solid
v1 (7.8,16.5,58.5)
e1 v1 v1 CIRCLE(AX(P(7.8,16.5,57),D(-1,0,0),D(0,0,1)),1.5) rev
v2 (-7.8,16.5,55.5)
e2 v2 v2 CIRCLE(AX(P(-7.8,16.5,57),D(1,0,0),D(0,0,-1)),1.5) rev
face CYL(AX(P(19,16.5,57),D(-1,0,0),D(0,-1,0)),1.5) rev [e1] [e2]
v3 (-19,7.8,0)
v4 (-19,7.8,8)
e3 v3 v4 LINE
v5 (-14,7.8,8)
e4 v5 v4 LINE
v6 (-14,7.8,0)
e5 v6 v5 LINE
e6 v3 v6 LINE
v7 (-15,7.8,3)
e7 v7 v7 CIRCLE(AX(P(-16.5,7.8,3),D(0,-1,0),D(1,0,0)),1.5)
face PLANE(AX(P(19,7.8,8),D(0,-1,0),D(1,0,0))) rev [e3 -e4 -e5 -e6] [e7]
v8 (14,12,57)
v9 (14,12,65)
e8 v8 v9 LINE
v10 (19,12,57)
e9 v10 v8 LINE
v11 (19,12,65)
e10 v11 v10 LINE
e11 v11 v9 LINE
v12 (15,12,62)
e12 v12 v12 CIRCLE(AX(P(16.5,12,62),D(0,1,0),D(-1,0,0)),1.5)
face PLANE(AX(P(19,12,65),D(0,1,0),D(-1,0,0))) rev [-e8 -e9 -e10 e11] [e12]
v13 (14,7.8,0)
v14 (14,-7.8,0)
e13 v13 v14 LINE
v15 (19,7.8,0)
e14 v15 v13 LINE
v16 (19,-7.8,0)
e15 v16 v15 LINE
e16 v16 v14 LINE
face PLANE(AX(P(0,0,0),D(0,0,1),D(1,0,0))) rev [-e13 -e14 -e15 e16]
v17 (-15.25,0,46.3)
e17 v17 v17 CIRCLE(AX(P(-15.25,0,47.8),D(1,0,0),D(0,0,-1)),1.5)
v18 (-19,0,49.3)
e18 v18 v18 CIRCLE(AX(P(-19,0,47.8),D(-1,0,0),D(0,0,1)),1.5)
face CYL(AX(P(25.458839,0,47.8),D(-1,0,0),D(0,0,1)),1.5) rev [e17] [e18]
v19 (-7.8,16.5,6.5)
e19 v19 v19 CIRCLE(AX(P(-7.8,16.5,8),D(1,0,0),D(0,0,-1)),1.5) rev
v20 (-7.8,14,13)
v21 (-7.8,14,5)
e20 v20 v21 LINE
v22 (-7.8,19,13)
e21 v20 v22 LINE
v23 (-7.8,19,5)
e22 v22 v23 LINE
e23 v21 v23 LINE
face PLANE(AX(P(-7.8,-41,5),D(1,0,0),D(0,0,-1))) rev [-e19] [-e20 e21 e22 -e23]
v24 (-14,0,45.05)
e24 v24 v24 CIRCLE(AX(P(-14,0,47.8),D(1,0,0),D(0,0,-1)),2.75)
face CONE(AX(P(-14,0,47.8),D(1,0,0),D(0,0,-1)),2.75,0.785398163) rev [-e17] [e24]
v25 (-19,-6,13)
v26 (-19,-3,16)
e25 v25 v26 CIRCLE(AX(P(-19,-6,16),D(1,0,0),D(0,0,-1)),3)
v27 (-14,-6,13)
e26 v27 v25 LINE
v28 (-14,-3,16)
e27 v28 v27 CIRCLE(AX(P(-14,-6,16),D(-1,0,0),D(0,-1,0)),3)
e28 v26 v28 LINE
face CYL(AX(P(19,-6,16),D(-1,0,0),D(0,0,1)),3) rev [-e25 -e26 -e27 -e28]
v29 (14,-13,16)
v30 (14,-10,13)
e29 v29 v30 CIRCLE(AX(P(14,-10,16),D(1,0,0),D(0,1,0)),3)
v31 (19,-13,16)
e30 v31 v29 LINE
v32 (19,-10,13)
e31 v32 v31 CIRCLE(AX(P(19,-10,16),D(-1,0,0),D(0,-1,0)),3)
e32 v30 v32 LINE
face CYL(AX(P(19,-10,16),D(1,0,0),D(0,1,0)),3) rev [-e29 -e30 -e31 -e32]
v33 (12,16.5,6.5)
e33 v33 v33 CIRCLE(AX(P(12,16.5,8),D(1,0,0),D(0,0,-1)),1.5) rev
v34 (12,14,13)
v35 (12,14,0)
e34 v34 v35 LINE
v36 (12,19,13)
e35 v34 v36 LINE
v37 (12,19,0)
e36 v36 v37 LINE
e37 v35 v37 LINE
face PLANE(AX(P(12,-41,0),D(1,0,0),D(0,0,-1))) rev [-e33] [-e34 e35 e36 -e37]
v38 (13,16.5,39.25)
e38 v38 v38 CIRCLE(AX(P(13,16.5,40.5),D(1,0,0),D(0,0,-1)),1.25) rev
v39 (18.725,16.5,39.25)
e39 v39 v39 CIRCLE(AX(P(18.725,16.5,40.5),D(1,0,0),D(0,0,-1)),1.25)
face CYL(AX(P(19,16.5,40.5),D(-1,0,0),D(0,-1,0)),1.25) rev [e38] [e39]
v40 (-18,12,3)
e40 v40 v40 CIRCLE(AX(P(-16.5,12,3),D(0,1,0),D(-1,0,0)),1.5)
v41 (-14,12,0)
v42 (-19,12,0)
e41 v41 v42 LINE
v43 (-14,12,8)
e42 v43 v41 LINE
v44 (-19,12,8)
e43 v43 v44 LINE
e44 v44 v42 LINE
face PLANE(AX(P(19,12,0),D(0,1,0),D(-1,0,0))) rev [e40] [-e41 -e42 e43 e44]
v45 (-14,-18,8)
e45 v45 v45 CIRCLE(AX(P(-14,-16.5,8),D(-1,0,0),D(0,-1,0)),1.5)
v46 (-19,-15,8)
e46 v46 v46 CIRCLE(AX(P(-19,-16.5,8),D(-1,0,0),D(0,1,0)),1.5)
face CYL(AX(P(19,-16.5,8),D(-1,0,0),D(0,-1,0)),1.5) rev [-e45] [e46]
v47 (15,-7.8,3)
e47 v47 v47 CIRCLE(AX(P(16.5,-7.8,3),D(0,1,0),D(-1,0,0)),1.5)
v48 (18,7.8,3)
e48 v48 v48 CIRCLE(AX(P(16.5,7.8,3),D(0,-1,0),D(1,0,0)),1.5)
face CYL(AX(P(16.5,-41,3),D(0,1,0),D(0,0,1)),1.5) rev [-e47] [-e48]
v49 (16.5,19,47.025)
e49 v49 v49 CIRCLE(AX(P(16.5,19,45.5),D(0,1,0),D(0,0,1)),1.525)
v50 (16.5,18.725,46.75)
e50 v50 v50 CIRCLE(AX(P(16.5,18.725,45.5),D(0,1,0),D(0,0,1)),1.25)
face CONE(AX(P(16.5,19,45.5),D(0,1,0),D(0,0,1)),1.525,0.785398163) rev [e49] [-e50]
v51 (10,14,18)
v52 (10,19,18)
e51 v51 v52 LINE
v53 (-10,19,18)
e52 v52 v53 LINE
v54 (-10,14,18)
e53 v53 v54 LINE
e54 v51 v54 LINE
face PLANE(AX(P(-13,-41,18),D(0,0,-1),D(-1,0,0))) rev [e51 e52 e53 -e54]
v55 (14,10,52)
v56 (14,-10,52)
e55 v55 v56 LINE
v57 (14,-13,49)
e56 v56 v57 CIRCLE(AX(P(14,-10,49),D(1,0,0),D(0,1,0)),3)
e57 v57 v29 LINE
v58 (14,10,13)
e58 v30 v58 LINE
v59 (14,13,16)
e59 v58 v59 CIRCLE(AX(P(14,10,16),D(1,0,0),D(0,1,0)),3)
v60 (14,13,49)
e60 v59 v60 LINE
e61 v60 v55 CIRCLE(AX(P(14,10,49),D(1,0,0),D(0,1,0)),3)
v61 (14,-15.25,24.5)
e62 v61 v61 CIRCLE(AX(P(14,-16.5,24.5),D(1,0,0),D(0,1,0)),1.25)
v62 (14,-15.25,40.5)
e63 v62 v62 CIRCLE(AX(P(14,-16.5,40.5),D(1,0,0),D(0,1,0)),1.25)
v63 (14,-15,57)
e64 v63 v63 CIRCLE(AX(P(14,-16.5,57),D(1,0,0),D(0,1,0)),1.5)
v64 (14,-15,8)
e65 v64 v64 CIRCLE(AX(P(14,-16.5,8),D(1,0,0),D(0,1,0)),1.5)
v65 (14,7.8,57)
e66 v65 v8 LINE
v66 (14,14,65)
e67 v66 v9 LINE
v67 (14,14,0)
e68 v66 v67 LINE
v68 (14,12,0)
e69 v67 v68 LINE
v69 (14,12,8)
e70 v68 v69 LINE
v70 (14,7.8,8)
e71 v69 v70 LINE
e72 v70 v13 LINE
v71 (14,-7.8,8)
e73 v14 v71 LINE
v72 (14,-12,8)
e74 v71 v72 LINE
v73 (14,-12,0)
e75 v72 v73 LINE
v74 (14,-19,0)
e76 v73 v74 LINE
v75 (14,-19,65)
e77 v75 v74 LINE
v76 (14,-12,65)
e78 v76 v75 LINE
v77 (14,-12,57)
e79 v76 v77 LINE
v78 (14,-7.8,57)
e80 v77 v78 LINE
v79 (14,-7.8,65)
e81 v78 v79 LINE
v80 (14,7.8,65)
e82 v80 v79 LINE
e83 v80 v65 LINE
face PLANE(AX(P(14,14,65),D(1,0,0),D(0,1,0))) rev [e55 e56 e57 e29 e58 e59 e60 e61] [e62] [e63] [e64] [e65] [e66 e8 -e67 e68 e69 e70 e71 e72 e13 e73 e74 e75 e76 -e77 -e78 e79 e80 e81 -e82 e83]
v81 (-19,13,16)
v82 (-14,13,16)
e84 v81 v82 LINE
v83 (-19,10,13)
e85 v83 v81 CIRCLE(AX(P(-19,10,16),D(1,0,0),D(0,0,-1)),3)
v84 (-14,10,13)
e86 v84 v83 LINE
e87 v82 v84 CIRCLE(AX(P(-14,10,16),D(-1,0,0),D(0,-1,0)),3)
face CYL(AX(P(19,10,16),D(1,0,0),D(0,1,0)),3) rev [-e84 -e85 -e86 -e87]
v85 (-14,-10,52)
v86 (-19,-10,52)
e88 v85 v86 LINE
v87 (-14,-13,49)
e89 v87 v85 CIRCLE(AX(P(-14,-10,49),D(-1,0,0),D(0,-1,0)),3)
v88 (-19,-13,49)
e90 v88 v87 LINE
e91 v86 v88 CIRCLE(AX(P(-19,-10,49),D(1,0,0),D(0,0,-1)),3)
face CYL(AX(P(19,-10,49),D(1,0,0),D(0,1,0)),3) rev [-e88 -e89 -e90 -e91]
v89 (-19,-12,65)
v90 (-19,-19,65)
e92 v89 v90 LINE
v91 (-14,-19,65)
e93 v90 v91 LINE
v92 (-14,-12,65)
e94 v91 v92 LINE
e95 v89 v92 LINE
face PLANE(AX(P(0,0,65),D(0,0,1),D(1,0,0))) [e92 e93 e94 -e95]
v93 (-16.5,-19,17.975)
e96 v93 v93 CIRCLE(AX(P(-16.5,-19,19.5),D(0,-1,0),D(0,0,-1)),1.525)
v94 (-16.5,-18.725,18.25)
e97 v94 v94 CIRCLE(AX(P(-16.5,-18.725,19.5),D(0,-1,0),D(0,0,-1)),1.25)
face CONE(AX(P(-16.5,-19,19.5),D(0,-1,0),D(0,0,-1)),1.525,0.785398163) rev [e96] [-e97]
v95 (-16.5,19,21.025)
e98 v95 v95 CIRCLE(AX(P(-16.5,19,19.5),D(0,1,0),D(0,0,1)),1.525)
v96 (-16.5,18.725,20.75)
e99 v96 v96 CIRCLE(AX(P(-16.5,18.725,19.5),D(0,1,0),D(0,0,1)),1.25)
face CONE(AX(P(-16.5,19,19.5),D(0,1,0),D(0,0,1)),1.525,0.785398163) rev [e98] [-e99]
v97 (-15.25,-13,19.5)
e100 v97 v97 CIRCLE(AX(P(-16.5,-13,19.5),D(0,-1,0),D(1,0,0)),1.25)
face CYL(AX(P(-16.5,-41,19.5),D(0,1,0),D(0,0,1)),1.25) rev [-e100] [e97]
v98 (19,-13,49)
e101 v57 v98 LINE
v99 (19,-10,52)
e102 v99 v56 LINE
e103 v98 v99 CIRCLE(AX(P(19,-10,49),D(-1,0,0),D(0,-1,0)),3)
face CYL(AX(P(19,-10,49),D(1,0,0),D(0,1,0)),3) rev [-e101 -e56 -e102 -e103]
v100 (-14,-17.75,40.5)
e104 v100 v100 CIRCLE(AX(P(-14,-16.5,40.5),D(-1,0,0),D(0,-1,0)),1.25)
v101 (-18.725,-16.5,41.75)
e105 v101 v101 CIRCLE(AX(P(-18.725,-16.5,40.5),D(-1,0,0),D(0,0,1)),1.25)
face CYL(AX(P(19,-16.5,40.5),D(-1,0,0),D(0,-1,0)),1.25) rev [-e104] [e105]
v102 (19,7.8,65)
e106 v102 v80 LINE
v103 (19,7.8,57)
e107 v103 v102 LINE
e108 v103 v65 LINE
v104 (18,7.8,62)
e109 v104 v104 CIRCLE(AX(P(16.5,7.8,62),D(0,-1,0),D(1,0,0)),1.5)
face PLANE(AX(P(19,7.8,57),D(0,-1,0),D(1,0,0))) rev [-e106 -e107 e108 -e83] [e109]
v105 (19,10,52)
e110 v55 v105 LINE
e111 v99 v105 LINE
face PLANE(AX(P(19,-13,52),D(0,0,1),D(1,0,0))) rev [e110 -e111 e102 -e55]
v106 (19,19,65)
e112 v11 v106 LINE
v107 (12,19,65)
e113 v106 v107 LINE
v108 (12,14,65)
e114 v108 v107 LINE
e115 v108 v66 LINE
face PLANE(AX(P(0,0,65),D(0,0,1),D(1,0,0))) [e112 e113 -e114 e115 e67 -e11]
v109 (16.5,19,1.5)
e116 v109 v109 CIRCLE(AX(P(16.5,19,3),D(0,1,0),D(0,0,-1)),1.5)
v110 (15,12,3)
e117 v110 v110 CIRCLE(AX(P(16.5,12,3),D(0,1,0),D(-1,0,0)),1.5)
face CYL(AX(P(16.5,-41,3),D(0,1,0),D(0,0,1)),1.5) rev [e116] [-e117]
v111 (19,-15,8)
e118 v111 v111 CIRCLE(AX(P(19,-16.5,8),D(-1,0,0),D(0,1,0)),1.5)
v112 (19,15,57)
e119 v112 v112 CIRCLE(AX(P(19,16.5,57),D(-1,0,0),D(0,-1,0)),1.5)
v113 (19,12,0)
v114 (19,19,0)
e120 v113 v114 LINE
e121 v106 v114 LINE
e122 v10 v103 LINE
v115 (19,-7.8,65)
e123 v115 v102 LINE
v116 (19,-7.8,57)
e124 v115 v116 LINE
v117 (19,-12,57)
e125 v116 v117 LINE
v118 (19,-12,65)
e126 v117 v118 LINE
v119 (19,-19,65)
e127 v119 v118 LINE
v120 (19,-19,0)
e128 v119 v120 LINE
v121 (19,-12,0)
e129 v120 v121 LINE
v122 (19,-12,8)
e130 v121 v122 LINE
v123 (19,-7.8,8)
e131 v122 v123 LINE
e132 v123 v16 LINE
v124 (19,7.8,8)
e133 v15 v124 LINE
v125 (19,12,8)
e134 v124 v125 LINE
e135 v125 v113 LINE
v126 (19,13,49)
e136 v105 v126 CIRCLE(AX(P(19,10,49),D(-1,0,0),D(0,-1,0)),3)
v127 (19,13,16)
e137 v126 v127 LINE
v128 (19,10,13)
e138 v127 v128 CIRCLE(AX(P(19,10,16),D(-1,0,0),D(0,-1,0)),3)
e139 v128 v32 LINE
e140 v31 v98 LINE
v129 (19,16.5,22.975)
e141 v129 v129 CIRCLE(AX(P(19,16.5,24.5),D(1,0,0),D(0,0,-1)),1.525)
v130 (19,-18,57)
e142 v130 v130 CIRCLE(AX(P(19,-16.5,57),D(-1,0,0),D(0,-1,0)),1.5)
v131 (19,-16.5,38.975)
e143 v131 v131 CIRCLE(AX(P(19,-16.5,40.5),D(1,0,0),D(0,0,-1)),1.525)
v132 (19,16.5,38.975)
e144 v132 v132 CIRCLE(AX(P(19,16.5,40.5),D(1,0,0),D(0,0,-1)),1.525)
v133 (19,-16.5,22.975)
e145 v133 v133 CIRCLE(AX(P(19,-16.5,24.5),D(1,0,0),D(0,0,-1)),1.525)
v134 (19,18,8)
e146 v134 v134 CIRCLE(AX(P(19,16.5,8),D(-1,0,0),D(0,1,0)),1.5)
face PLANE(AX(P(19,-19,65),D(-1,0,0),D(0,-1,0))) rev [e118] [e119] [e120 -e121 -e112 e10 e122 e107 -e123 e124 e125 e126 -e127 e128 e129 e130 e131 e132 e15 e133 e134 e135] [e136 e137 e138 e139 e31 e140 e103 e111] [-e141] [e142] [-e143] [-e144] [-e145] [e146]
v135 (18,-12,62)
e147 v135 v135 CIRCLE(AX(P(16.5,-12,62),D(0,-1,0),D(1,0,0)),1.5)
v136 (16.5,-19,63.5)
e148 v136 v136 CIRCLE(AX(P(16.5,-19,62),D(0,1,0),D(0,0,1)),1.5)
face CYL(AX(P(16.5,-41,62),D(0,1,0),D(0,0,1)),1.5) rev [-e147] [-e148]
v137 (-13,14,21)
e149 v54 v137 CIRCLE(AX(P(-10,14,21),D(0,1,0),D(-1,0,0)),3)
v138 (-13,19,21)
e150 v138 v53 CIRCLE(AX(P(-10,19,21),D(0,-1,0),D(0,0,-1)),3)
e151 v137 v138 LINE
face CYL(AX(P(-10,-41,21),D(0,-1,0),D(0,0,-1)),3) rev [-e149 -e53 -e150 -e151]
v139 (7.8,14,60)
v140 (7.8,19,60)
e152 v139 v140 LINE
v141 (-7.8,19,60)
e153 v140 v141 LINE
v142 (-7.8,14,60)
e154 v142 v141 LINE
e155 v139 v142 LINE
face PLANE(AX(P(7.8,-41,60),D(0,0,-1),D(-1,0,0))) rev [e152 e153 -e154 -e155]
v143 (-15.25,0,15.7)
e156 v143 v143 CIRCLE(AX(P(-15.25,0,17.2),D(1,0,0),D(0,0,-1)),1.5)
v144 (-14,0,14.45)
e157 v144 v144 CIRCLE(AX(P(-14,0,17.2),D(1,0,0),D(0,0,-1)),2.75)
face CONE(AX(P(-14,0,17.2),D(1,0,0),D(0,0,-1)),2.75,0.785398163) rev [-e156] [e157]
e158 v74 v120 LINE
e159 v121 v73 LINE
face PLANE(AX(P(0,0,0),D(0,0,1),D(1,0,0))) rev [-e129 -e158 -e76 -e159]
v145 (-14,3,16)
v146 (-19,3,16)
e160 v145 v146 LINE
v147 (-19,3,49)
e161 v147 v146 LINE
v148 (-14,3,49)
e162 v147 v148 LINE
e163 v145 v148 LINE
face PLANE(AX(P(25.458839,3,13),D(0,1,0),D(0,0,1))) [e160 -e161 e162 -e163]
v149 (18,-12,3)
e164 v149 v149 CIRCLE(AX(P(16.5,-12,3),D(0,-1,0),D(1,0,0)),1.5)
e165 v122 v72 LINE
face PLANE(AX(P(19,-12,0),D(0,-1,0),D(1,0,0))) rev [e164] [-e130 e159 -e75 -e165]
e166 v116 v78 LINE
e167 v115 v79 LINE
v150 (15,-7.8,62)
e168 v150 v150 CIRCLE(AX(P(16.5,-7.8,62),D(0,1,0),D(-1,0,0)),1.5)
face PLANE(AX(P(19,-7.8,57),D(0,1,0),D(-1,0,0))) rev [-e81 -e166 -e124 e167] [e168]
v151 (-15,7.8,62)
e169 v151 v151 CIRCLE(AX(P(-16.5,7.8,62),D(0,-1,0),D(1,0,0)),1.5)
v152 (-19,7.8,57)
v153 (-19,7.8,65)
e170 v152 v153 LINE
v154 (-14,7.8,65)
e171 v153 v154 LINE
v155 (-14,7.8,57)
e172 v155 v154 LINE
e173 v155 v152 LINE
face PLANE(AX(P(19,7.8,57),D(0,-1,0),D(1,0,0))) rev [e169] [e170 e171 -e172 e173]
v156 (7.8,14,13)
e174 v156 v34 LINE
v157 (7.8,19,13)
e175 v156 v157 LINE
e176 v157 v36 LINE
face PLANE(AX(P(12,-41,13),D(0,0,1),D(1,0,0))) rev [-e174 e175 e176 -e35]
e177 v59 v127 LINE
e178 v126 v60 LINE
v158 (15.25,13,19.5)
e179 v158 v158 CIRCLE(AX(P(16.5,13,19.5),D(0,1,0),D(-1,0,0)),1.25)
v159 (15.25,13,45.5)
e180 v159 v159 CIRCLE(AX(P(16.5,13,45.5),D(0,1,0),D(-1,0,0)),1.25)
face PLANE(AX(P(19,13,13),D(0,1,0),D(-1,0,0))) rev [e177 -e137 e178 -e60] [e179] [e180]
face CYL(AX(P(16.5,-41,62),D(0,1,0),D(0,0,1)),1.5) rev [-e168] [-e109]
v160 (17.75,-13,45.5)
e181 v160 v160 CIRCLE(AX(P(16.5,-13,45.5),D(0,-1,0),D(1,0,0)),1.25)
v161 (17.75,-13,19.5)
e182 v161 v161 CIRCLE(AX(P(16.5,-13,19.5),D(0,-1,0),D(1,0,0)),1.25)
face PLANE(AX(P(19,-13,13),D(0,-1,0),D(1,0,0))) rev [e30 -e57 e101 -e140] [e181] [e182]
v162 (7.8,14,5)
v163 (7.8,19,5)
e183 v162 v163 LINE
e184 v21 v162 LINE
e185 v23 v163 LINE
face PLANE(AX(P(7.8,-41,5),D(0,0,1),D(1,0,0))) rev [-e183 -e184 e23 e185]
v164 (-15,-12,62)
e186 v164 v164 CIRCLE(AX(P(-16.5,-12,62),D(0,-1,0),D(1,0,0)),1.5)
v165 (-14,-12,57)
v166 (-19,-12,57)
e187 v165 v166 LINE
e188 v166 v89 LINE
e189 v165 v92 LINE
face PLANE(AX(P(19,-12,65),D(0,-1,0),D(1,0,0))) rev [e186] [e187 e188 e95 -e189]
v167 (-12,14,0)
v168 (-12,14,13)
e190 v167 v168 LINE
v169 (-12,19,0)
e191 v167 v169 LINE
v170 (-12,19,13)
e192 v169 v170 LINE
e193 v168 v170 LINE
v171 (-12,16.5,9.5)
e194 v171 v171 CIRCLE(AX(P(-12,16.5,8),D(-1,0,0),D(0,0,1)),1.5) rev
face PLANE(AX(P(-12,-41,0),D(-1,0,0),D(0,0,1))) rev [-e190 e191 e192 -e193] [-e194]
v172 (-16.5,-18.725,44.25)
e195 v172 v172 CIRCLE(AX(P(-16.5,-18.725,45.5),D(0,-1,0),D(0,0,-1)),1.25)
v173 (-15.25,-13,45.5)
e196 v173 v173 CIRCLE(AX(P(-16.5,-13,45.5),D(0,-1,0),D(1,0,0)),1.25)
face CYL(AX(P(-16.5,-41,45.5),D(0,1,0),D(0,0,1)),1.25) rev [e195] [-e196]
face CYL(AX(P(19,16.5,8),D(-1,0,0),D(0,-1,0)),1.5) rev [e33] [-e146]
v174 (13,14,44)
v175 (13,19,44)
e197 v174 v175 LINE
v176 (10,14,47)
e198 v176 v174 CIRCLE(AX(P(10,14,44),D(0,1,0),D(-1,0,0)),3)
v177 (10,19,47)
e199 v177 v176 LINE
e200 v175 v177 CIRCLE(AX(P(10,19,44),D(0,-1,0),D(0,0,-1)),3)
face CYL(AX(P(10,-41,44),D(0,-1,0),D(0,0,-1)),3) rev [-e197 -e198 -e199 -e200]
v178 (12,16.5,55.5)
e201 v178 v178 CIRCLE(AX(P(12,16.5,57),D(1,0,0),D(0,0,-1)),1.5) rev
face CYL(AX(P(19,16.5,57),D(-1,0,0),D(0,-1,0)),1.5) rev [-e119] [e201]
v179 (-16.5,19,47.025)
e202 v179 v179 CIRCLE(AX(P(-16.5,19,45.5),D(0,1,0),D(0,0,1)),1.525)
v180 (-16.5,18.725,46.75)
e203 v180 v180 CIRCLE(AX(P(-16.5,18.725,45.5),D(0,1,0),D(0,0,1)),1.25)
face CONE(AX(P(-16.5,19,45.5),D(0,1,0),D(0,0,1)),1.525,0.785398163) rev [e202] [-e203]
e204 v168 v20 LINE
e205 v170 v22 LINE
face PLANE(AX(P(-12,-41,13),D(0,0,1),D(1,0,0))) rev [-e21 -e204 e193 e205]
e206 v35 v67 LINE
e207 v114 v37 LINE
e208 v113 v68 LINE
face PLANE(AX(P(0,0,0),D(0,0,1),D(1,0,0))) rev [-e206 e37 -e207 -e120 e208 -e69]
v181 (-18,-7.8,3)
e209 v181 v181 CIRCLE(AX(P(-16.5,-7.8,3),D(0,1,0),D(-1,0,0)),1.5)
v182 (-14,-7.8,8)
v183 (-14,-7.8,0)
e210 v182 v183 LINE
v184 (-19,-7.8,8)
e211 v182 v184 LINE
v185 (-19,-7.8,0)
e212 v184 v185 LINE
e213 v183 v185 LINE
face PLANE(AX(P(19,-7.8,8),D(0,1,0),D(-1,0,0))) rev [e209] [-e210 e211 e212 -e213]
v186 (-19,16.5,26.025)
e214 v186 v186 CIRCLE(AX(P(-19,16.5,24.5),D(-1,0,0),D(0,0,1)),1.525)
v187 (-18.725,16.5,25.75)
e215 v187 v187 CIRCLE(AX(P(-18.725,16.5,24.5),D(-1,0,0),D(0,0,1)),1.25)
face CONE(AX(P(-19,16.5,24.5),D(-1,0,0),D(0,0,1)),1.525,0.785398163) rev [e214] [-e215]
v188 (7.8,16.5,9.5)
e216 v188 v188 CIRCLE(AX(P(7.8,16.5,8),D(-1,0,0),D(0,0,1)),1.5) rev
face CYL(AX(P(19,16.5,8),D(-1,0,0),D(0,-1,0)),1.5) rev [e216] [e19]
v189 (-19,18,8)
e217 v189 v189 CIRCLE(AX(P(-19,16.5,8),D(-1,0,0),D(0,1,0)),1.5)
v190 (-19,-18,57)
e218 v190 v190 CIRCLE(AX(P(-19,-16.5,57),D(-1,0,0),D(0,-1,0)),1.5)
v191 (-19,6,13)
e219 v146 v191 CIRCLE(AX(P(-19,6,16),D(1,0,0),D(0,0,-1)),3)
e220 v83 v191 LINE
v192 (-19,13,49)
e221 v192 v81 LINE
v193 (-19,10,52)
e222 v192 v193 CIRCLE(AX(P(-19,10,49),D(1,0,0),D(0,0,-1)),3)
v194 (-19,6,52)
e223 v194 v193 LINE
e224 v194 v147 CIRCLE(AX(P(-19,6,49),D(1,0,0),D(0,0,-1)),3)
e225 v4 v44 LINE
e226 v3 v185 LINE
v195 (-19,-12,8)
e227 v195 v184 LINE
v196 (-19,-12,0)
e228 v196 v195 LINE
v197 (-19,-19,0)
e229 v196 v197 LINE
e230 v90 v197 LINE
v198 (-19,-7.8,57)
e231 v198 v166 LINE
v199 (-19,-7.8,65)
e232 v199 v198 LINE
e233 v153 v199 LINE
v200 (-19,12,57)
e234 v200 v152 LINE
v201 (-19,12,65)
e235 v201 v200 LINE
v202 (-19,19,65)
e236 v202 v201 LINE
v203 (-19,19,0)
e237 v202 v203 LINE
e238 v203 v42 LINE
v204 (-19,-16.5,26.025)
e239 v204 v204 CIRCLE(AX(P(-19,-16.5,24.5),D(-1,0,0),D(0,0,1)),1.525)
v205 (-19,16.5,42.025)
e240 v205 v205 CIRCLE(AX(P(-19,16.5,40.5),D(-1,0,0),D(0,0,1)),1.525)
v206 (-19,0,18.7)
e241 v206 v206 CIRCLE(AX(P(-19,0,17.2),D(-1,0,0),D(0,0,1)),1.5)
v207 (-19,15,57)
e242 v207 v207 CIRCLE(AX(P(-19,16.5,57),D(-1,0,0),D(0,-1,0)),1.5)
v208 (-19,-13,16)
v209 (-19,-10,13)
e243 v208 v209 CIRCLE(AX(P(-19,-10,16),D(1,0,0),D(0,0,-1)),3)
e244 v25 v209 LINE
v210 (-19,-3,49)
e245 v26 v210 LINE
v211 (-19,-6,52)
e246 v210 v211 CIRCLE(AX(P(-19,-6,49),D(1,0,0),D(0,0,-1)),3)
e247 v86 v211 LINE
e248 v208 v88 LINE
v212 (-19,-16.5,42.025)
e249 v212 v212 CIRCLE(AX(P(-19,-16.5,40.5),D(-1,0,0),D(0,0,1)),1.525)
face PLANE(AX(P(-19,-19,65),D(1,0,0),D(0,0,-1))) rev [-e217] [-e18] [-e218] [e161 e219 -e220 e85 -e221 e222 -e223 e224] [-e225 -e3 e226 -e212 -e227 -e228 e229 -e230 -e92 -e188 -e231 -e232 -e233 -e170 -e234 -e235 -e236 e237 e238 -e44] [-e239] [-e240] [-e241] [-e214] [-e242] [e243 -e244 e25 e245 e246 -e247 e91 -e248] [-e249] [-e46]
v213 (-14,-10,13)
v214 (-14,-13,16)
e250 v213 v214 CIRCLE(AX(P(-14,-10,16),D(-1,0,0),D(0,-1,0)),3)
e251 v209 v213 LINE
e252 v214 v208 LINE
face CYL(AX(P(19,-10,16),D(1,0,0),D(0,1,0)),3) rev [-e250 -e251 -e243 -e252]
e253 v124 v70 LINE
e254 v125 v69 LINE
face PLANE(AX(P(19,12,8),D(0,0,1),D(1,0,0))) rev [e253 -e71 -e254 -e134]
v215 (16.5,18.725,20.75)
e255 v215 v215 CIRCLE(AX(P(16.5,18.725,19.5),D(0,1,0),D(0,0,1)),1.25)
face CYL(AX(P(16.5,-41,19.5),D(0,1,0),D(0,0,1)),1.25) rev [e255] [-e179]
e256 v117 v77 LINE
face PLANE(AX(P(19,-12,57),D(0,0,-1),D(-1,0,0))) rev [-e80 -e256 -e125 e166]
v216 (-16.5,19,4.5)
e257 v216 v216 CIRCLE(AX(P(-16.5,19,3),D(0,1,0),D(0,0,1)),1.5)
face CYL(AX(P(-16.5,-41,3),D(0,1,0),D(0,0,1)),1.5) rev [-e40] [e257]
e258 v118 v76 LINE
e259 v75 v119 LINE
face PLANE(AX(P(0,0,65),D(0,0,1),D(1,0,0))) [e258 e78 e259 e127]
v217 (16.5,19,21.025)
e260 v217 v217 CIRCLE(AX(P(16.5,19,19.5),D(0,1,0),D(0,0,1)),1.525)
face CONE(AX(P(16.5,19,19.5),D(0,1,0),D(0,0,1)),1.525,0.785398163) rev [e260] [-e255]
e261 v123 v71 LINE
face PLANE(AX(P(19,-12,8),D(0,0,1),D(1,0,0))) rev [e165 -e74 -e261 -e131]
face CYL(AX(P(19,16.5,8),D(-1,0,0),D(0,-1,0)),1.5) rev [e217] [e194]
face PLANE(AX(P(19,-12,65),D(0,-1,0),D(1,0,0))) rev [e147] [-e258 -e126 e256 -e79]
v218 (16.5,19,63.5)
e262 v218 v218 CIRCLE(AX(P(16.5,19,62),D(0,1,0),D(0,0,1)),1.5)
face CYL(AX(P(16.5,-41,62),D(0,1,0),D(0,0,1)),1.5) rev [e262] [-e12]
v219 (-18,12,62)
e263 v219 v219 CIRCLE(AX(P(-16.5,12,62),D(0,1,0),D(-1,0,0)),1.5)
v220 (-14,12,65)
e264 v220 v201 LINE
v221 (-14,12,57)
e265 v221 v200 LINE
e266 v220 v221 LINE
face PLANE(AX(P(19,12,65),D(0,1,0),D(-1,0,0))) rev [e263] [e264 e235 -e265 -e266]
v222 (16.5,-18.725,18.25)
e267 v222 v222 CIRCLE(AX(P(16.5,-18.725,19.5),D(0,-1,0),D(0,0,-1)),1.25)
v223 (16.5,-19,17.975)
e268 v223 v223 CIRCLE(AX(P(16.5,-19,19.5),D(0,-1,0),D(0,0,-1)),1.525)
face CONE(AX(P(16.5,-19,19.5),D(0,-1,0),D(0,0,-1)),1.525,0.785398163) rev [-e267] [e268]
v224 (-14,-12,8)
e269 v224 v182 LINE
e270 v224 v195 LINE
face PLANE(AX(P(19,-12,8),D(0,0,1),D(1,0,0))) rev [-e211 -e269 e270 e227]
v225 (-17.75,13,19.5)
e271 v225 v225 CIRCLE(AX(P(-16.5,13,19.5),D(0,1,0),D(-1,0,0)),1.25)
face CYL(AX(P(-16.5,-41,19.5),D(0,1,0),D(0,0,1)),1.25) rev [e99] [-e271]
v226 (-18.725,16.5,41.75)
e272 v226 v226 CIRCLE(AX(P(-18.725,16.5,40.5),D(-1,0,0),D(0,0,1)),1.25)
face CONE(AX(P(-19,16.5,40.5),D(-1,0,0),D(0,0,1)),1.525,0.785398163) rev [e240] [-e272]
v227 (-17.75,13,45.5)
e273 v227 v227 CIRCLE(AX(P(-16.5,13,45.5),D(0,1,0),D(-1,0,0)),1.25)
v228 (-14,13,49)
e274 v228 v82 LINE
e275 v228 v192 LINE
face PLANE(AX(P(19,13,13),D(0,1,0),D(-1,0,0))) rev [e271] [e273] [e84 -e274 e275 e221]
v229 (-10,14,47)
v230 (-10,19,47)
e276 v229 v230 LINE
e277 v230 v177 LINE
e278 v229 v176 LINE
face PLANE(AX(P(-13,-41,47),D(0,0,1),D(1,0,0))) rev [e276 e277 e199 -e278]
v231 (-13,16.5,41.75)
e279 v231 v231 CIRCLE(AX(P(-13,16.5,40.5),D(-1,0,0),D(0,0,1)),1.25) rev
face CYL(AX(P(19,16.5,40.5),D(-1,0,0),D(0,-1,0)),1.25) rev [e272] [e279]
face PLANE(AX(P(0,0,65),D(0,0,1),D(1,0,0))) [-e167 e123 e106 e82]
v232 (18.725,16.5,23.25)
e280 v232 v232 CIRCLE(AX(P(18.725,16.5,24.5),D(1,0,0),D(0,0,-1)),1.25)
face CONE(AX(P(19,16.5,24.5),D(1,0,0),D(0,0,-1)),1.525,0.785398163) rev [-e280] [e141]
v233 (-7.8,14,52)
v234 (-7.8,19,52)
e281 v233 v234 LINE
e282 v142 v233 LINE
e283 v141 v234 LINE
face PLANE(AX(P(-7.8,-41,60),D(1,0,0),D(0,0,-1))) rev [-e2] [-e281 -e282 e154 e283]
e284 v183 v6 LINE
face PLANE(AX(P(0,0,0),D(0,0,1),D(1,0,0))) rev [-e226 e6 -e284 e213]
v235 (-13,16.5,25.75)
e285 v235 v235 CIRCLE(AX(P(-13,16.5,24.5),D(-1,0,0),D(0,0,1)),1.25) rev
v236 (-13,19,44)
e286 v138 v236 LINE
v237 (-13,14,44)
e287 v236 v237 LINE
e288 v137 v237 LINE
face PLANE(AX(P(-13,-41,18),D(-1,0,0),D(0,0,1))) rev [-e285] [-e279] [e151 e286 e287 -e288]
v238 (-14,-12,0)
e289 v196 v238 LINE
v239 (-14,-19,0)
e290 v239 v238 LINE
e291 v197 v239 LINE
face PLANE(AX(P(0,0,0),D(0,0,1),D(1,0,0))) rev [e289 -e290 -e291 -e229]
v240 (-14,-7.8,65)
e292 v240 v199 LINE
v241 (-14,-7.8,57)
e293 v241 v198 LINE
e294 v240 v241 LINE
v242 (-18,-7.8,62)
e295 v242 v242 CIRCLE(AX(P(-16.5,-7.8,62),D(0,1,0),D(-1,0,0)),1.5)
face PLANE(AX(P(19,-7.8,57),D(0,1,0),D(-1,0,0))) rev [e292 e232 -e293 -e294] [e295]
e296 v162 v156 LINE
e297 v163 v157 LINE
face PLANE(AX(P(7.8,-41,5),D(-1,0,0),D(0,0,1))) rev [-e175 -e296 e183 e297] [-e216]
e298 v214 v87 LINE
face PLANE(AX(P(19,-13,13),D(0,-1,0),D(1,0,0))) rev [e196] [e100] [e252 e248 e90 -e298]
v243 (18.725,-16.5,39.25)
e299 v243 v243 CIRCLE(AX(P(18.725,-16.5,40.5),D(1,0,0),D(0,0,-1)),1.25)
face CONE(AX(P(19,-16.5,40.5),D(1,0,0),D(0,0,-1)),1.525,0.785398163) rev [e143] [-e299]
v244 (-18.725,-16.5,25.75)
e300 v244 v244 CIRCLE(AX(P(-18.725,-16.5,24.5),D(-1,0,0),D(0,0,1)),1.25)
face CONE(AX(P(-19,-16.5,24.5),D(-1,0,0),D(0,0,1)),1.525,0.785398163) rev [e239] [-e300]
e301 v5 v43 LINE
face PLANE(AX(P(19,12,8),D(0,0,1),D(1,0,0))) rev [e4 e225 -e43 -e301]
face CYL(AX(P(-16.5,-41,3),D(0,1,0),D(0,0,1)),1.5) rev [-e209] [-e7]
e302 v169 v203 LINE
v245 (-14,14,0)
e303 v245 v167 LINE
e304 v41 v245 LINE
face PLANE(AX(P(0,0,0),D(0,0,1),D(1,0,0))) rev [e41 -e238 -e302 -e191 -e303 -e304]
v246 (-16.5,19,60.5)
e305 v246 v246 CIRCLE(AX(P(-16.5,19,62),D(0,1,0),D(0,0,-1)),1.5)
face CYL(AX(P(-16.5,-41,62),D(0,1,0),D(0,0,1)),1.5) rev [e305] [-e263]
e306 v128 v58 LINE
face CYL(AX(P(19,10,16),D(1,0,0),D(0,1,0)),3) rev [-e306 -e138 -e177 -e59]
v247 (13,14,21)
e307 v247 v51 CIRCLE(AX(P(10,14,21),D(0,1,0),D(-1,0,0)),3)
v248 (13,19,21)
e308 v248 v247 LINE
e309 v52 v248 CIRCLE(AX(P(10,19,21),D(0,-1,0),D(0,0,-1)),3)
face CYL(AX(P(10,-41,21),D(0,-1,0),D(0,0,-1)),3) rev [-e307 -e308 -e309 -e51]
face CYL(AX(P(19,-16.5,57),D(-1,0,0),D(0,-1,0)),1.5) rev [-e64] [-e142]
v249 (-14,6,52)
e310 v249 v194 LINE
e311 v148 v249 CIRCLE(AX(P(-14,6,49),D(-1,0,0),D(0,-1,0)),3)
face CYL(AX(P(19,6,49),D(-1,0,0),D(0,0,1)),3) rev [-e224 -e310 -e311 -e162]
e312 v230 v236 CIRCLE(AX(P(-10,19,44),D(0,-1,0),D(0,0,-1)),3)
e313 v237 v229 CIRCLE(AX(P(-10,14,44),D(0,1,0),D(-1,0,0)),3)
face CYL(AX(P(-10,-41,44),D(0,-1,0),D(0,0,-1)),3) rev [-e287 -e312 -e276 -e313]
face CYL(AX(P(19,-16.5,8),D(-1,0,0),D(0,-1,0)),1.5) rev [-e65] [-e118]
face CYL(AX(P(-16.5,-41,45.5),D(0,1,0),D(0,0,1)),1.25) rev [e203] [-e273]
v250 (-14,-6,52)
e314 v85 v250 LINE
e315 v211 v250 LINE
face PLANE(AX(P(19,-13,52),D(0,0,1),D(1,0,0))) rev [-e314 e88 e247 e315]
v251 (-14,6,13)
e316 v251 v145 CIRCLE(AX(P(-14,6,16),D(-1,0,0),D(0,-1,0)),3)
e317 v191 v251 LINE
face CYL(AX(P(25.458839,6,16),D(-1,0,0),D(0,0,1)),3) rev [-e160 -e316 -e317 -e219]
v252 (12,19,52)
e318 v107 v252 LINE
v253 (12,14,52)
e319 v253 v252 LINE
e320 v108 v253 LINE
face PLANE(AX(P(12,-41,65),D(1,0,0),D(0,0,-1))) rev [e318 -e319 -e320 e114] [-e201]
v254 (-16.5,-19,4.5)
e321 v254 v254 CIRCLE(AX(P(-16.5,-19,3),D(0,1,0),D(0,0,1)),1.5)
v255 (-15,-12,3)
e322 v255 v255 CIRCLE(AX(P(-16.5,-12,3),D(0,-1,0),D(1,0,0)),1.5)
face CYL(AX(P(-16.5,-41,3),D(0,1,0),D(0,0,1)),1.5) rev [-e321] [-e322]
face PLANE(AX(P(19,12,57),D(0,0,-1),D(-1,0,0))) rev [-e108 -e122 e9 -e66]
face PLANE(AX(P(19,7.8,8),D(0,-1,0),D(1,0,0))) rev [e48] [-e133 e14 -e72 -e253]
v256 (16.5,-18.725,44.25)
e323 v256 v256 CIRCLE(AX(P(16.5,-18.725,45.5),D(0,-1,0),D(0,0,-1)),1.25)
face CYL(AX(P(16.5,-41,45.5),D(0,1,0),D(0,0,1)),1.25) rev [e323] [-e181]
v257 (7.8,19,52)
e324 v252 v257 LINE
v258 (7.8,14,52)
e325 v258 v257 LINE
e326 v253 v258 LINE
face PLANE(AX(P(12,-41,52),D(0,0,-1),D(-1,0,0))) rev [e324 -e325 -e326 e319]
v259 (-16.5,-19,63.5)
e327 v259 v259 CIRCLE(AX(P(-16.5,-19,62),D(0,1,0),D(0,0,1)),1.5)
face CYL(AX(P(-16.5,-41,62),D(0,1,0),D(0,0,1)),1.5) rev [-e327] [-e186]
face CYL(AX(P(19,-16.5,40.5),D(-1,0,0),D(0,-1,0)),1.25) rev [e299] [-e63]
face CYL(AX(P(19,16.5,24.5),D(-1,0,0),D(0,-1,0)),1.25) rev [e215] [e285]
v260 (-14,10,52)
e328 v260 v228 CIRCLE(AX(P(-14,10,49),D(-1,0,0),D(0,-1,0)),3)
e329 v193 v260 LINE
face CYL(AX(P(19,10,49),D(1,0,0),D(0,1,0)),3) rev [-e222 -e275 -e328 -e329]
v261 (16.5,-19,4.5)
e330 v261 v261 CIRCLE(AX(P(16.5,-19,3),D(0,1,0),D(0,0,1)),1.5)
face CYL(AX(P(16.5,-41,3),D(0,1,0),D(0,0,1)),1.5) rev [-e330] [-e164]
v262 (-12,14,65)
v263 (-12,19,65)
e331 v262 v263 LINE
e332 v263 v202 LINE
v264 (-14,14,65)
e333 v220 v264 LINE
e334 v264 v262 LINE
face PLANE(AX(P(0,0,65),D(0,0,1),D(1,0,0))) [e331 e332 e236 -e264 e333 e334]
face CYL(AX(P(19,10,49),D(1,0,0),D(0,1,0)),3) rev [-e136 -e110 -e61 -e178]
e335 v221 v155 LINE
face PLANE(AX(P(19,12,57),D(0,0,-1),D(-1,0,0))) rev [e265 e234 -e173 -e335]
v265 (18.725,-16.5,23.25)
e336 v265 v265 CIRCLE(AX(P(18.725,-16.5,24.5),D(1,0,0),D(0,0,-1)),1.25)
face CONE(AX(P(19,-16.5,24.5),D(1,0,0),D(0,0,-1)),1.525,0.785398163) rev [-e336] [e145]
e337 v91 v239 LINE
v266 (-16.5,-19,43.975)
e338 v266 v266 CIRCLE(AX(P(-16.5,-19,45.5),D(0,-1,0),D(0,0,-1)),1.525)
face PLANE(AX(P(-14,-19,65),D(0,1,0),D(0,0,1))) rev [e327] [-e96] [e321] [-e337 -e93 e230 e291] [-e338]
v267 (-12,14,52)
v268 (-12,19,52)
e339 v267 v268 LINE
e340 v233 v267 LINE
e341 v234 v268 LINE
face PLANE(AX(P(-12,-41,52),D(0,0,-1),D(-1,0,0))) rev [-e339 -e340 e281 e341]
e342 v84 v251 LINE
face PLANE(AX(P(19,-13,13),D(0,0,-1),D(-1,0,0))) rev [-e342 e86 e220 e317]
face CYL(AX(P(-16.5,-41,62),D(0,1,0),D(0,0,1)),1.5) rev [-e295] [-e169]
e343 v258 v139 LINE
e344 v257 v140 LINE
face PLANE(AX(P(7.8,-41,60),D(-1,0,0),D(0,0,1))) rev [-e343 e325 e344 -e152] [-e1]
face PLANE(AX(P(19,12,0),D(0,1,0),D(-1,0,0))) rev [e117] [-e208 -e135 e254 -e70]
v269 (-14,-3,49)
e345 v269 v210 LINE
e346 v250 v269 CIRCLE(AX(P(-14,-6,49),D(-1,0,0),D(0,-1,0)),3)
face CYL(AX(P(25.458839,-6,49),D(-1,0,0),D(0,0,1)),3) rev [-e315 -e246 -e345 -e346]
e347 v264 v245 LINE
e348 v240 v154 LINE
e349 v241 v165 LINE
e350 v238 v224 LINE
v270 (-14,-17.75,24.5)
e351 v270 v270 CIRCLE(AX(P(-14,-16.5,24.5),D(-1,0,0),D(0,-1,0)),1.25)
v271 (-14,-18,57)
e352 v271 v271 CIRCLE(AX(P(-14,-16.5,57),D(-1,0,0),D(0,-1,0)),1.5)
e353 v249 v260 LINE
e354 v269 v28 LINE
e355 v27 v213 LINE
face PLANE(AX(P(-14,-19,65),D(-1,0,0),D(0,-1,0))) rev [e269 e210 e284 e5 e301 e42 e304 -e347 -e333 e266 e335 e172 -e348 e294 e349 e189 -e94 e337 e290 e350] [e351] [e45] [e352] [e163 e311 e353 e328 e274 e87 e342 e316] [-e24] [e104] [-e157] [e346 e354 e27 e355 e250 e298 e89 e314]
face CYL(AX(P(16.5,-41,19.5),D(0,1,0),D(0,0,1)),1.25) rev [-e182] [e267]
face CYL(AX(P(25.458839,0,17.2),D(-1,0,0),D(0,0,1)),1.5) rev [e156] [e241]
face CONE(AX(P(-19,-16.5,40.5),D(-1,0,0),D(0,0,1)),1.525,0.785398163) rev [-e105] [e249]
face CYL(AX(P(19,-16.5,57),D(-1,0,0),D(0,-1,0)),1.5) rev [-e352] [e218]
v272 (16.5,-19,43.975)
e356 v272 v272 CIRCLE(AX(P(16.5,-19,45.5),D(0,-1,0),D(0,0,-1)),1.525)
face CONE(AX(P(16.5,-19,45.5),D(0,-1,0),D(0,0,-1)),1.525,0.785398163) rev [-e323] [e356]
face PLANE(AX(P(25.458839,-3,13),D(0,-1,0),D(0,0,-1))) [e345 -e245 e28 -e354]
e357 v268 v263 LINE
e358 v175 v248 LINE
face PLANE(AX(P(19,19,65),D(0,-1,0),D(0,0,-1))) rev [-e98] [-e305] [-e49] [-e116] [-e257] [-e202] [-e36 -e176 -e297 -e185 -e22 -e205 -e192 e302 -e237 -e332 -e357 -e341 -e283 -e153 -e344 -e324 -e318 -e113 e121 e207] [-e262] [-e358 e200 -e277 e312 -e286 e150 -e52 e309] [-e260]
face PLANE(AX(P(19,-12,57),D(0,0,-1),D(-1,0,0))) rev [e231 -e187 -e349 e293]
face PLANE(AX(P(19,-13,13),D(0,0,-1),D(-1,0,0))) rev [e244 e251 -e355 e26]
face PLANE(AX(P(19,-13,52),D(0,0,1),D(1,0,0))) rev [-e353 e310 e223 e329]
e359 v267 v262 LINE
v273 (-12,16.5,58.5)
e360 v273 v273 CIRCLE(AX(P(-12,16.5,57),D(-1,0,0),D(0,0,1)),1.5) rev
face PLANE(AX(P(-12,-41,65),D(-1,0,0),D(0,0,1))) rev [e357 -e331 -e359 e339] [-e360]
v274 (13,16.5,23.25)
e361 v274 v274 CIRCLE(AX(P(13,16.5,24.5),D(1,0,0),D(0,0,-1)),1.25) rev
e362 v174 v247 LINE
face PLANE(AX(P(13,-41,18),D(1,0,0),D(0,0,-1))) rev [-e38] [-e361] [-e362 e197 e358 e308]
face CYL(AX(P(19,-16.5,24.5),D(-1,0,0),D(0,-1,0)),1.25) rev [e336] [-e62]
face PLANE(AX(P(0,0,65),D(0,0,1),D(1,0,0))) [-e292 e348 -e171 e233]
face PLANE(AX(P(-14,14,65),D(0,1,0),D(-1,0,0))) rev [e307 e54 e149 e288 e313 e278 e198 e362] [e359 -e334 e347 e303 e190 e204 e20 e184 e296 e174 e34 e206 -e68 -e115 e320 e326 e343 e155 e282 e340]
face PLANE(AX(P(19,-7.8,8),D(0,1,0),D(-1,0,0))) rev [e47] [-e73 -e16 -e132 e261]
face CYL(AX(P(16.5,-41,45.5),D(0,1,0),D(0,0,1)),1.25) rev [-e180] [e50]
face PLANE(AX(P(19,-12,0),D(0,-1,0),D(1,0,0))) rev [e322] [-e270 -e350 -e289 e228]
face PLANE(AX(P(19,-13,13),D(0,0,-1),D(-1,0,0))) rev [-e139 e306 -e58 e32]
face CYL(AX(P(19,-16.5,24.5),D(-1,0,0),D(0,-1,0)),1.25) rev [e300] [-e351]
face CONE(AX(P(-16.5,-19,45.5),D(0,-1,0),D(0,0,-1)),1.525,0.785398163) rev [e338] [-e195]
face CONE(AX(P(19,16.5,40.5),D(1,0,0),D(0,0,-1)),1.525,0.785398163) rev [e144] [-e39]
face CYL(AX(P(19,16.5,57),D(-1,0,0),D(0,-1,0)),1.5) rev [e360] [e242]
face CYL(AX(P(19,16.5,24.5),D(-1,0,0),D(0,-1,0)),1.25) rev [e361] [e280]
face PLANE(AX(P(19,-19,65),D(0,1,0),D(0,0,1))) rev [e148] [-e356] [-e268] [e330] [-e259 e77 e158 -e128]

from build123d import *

# Parameters (mm, degrees)
EXTRUDE_1_DEPTH                = 65
SKETCH_2_R                     = 1.5
SKETCH_2_R_2                   = 1.25
SKETCH_2_W                     = 8
SKETCH_2_H                     = 4.2
SKETCH_2_W_2                   = 39
SKETCH_2_H_2                   = 26
CUT_EXTRUDE_1_DEPTH            = 78.653074633
SKETCH_3_R                     = 1.5
SKETCH_3_R_2                   = 1.25
SKETCH_3_W                     = 26
SKETCH_3_H                     = 29
CUT_EXTRUDE_2_DEPTH            = 60
SKETCH_5_W                     = 39
SKETCH_5_H                     = 6
SKETCH_5_R                     = 1.5
EXTRUDE_2_DEPTH                = 5
FILLET_1_R                     = 3
HOLE_WIZARD_M3_1_9_D           = 3
HOLE_WIZARD_M3_1_9_CSINK_D     = 5.5
HOLE_WIZARD_M3_1_9_CSINK_ANGLE = 90


# Read off the part's stored shape, not the designer's step: M3 螺纹孔1
with BuildPart() as part:
    # 草图1 → 凸台-拉伸1 (new body)
    with BuildSketch(Plane.XY):
        Polygon((-14, -19), (-14, 14), (14, 14), (14, -19), (19, -19), (19, 19), (-19, 19), (-19, -19), align=None)
    extrude(amount=EXTRUDE_1_DEPTH)

    # 草图2 → 切除-拉伸1 (cut, through all)
    with BuildSketch(Plane.ZY.offset(19)):
        with Locations(Location((57, -16.5, 0), (0, 0, 270))):
            Circle(SKETCH_2_R)
        with Locations(Location((57, 16.5, 0), (0, 0, 270))):
            Circle(SKETCH_2_R)
        with Locations(Location((8, -16.5, 0), (0, 0, 90))):
            Circle(SKETCH_2_R)
        with Locations(Location((8, 16.5, 0), (0, 0, 90))):
            Circle(SKETCH_2_R)
        with Locations(Location((40.5, -16.5, 0), (0, 0, 270))):
            Circle(SKETCH_2_R_2)
        with Locations(Location((24.5, -16.5, 0), (0, 0, 270))):
            Circle(SKETCH_2_R_2)
        with Locations(Location((24.5, 16.5, 0), (0, 0, 90))):
            Circle(SKETCH_2_R_2)
        with Locations(Location((40.5, 16.5, 0), (0, 0, 90))):
            Circle(SKETCH_2_R_2)
        with Locations((61, 9.9)):
            Rectangle(SKETCH_2_W, SKETCH_2_H)
        with Locations((61, -9.9)):
            Rectangle(SKETCH_2_W, SKETCH_2_H)
        with Locations((4, -9.9)):
            Rectangle(SKETCH_2_W, SKETCH_2_H)
        with Locations((4, 9.9)):
            Rectangle(SKETCH_2_W, SKETCH_2_H)
        with Locations((32.5, 0)):
            Rectangle(SKETCH_2_W_2, SKETCH_2_H_2)
    extrude(amount=-CUT_EXTRUDE_1_DEPTH, mode=Mode.SUBTRACT)

    # 草图3 → 切除-拉伸2 (cut)
    with BuildSketch(Plane(origin=(0, 19, 0), x_dir=(1, 0, 0), z_dir=(0, 1, 0))):
        with Locations(Location((16.5, -62, 0), (0, 0, 270))):
            Circle(SKETCH_3_R)
        with Locations(Location((-16.5, -62, 0), (0, 0, 270))):
            Circle(SKETCH_3_R)
        with Locations(Location((-16.5, -3, 0), (0, 0, 270))):
            Circle(SKETCH_3_R)
        with Locations(Location((16.5, -3, 0), (0, 0, 180))):
            Circle(SKETCH_3_R)
        with Locations(Location((16.5, -45.5, 0), (0, 0, 270))):
            Circle(SKETCH_3_R_2)
        with Locations(Location((16.5, -19.5, 0), (0, 0, 270))):
            Circle(SKETCH_3_R_2)
        with Locations(Location((-16.5, -19.5, 0), (0, 0, 270))):
            Circle(SKETCH_3_R_2)
        with Locations(Location((-16.5, -45.5, 0), (0, 0, 180))):
            Circle(SKETCH_3_R_2)
        Polygon((7.8, -65), (-7.8, -65), (-12, -65), (-12, -52), (-7.8, -52), (-7.8, -60), (7.8, -60), (7.8, -52), (12, -52), (12, -65), align=None)
        Polygon((-12, 0), (-12, -13), (-7.8, -13), (-7.8, -5), (7.8, -5), (7.8, -13), (12, -13), (12, 0), (7.8, 0), (-7.8, 0), align=None)
        with Locations((0, -32.5)):
            Rectangle(SKETCH_3_W, SKETCH_3_H)
    extrude(amount=-CUT_EXTRUDE_2_DEPTH, mode=Mode.SUBTRACT)

    # Hole Wizard M3 _1 outline → Hole Wizard M3 _1 (revolve, cut)
    with BuildSketch(Plane(origin=(0, 16.5, 24.5), x_dir=(0, 1, 0), z_dir=(0, 0, -1))):
        Polygon((1.25, 19), (1.25, 18.725), (1.525, 19), align=None)
        Polygon((1.525, -19), (1.25, -18.725), (1.25, -19), align=None)
    revolve(axis=Axis((0, 16.5, 24.5), (1, 0, 0)), mode=Mode.SUBTRACT)

    # Hole Wizard M3 _1 2 outline → Hole Wizard M3 _1 2 (revolve, cut)
    with BuildSketch(Plane(origin=(0, 16.5, 40.5), x_dir=(0, 1, 0), z_dir=(0, 0, -1))):
        Polygon((1.25, 19), (1.25, 18.725), (1.525, 19), align=None)
        Polygon((1.525, -19), (1.25, -18.725), (1.25, -19), align=None)
    revolve(axis=Axis((0, 16.5, 40.5), (1, 0, 0)), mode=Mode.SUBTRACT)

    # Hole Wizard M3 _1 3 outline → Hole Wizard M3 _1 3 (revolve, cut)
    with BuildSketch(Plane(origin=(0, -16.5, 40.5), x_dir=(0, 1, 0), z_dir=(0, 0, -1))):
        Polygon((1.25, 19), (1.25, 18.725), (1.525, 19), align=None)
        Polygon((1.525, -19), (1.25, -18.725), (1.25, -19), align=None)
    revolve(axis=Axis((0, -16.5, 40.5), (1, 0, 0)), mode=Mode.SUBTRACT)

    # Hole Wizard M3 _1 4 outline → Hole Wizard M3 _1 4 (revolve, cut)
    with BuildSketch(Plane(origin=(0, -16.5, 24.5), x_dir=(0, 1, 0), z_dir=(0, 0, -1))):
        Polygon((1.25, 19), (1.25, 18.725), (1.525, 19), align=None)
        Polygon((1.525, -19), (1.25, -18.725), (1.25, -19), align=None)
    revolve(axis=Axis((0, -16.5, 24.5), (1, 0, 0)), mode=Mode.SUBTRACT)

    # Hole Wizard M3 _1 5 outline → Hole Wizard M3 _1 5 (revolve, cut)
    with BuildSketch(Plane(origin=(16.5, 0, 45.5), x_dir=(1, 0, 0), z_dir=(0, 0, 1))):
        Polygon((1.525, -19), (1.25, -18.725), (1.25, -19), align=None)
        Polygon((1.25, 19), (1.25, 18.725), (1.525, 19), align=None)
    revolve(axis=Axis((16.5, 0, 45.5), (0, 1, 0)), mode=Mode.SUBTRACT)

    # Hole Wizard M3 _1 6 outline → Hole Wizard M3 _1 6 (revolve, cut)
    with BuildSketch(Plane(origin=(-16.5, 0, 19.5), x_dir=(1, 0, 0), z_dir=(0, 0, 1))):
        Polygon((1.525, -19), (1.25, -18.725), (1.25, -19), align=None)
        Polygon((1.25, 19), (1.25, 18.725), (1.525, 19), align=None)
    revolve(axis=Axis((-16.5, 0, 19.5), (0, 1, 0)), mode=Mode.SUBTRACT)

    # Hole Wizard M3 _1 7 outline → Hole Wizard M3 _1 7 (revolve, cut)
    with BuildSketch(Plane(origin=(-16.5, 0, 45.5), x_dir=(1, 0, 0), z_dir=(0, 0, 1))):
        Polygon((1.525, -19), (1.25, -18.725), (1.25, -19), align=None)
        Polygon((1.25, 19), (1.25, 18.725), (1.525, 19), align=None)
    revolve(axis=Axis((-16.5, 0, 45.5), (0, 1, 0)), mode=Mode.SUBTRACT)

    # Hole Wizard M3 _1 8 outline → Hole Wizard M3 _1 8 (revolve, cut)
    with BuildSketch(Plane(origin=(16.5, 0, 19.5), x_dir=(1, 0, 0), z_dir=(0, 0, 1))):
        Polygon((1.525, -19), (1.25, -18.725), (1.25, -19), align=None)
        Polygon((1.25, 19), (1.25, 18.725), (1.525, 19), align=None)
    revolve(axis=Axis((16.5, 0, 19.5), (0, 1, 0)), mode=Mode.SUBTRACT)

    # 草图5 → 凸台-拉伸2 (add)
    with BuildSketch(Plane.ZY.offset(19)):
        with Locations((32.5, 0)):
            Rectangle(SKETCH_5_W, SKETCH_5_H)
        with Locations((17.2, 0)):
            Circle(SKETCH_5_R, mode=Mode.SUBTRACT)
        with Locations((47.8, 0)):
            Circle(SKETCH_5_R, mode=Mode.SUBTRACT)
    extrude(amount=-EXTRUDE_2_DEPTH)

    # 圆角1
    fillet_1_edges = [part.edges().sort_by_distance(p)[0] for p in [
        (13, 16.5, 47),
        (-13, 16.5, 18),
        (13, 16.5, 18),
        (-13, 16.5, 47),
        (-16.5, -3, 52),
        (-16.5, 3, 52),
        (-16.5, 3, 13),
        (-16.5, -3, 13),
        (-16.5, 13, 52),
        (16.5, 13, 52),
        (-16.5, -13, 52),
        (16.5, -13, 52),
        (-16.5, -13, 13),
        (16.5, -13, 13),
        (-16.5, 13, 13),
        (16.5, 13, 13),
    ]]
    fillet(fillet_1_edges, radius=FILLET_1_R)

    # Hole Wizard M3 _1 9 (through all)
    with Locations(Plane(origin=(-14, 0, 47.8), x_dir=(0, 1, 0), z_dir=(1, 0, 0))):
        with Locations((0, 0), (0, -30.6)):
            CounterSinkHole(HOLE_WIZARD_M3_1_9_D / 2, HOLE_WIZARD_M3_1_9_CSINK_D / 2, counter_sink_angle=HOLE_WIZARD_M3_1_9_CSINK_ANGLE)


solid = part.part
